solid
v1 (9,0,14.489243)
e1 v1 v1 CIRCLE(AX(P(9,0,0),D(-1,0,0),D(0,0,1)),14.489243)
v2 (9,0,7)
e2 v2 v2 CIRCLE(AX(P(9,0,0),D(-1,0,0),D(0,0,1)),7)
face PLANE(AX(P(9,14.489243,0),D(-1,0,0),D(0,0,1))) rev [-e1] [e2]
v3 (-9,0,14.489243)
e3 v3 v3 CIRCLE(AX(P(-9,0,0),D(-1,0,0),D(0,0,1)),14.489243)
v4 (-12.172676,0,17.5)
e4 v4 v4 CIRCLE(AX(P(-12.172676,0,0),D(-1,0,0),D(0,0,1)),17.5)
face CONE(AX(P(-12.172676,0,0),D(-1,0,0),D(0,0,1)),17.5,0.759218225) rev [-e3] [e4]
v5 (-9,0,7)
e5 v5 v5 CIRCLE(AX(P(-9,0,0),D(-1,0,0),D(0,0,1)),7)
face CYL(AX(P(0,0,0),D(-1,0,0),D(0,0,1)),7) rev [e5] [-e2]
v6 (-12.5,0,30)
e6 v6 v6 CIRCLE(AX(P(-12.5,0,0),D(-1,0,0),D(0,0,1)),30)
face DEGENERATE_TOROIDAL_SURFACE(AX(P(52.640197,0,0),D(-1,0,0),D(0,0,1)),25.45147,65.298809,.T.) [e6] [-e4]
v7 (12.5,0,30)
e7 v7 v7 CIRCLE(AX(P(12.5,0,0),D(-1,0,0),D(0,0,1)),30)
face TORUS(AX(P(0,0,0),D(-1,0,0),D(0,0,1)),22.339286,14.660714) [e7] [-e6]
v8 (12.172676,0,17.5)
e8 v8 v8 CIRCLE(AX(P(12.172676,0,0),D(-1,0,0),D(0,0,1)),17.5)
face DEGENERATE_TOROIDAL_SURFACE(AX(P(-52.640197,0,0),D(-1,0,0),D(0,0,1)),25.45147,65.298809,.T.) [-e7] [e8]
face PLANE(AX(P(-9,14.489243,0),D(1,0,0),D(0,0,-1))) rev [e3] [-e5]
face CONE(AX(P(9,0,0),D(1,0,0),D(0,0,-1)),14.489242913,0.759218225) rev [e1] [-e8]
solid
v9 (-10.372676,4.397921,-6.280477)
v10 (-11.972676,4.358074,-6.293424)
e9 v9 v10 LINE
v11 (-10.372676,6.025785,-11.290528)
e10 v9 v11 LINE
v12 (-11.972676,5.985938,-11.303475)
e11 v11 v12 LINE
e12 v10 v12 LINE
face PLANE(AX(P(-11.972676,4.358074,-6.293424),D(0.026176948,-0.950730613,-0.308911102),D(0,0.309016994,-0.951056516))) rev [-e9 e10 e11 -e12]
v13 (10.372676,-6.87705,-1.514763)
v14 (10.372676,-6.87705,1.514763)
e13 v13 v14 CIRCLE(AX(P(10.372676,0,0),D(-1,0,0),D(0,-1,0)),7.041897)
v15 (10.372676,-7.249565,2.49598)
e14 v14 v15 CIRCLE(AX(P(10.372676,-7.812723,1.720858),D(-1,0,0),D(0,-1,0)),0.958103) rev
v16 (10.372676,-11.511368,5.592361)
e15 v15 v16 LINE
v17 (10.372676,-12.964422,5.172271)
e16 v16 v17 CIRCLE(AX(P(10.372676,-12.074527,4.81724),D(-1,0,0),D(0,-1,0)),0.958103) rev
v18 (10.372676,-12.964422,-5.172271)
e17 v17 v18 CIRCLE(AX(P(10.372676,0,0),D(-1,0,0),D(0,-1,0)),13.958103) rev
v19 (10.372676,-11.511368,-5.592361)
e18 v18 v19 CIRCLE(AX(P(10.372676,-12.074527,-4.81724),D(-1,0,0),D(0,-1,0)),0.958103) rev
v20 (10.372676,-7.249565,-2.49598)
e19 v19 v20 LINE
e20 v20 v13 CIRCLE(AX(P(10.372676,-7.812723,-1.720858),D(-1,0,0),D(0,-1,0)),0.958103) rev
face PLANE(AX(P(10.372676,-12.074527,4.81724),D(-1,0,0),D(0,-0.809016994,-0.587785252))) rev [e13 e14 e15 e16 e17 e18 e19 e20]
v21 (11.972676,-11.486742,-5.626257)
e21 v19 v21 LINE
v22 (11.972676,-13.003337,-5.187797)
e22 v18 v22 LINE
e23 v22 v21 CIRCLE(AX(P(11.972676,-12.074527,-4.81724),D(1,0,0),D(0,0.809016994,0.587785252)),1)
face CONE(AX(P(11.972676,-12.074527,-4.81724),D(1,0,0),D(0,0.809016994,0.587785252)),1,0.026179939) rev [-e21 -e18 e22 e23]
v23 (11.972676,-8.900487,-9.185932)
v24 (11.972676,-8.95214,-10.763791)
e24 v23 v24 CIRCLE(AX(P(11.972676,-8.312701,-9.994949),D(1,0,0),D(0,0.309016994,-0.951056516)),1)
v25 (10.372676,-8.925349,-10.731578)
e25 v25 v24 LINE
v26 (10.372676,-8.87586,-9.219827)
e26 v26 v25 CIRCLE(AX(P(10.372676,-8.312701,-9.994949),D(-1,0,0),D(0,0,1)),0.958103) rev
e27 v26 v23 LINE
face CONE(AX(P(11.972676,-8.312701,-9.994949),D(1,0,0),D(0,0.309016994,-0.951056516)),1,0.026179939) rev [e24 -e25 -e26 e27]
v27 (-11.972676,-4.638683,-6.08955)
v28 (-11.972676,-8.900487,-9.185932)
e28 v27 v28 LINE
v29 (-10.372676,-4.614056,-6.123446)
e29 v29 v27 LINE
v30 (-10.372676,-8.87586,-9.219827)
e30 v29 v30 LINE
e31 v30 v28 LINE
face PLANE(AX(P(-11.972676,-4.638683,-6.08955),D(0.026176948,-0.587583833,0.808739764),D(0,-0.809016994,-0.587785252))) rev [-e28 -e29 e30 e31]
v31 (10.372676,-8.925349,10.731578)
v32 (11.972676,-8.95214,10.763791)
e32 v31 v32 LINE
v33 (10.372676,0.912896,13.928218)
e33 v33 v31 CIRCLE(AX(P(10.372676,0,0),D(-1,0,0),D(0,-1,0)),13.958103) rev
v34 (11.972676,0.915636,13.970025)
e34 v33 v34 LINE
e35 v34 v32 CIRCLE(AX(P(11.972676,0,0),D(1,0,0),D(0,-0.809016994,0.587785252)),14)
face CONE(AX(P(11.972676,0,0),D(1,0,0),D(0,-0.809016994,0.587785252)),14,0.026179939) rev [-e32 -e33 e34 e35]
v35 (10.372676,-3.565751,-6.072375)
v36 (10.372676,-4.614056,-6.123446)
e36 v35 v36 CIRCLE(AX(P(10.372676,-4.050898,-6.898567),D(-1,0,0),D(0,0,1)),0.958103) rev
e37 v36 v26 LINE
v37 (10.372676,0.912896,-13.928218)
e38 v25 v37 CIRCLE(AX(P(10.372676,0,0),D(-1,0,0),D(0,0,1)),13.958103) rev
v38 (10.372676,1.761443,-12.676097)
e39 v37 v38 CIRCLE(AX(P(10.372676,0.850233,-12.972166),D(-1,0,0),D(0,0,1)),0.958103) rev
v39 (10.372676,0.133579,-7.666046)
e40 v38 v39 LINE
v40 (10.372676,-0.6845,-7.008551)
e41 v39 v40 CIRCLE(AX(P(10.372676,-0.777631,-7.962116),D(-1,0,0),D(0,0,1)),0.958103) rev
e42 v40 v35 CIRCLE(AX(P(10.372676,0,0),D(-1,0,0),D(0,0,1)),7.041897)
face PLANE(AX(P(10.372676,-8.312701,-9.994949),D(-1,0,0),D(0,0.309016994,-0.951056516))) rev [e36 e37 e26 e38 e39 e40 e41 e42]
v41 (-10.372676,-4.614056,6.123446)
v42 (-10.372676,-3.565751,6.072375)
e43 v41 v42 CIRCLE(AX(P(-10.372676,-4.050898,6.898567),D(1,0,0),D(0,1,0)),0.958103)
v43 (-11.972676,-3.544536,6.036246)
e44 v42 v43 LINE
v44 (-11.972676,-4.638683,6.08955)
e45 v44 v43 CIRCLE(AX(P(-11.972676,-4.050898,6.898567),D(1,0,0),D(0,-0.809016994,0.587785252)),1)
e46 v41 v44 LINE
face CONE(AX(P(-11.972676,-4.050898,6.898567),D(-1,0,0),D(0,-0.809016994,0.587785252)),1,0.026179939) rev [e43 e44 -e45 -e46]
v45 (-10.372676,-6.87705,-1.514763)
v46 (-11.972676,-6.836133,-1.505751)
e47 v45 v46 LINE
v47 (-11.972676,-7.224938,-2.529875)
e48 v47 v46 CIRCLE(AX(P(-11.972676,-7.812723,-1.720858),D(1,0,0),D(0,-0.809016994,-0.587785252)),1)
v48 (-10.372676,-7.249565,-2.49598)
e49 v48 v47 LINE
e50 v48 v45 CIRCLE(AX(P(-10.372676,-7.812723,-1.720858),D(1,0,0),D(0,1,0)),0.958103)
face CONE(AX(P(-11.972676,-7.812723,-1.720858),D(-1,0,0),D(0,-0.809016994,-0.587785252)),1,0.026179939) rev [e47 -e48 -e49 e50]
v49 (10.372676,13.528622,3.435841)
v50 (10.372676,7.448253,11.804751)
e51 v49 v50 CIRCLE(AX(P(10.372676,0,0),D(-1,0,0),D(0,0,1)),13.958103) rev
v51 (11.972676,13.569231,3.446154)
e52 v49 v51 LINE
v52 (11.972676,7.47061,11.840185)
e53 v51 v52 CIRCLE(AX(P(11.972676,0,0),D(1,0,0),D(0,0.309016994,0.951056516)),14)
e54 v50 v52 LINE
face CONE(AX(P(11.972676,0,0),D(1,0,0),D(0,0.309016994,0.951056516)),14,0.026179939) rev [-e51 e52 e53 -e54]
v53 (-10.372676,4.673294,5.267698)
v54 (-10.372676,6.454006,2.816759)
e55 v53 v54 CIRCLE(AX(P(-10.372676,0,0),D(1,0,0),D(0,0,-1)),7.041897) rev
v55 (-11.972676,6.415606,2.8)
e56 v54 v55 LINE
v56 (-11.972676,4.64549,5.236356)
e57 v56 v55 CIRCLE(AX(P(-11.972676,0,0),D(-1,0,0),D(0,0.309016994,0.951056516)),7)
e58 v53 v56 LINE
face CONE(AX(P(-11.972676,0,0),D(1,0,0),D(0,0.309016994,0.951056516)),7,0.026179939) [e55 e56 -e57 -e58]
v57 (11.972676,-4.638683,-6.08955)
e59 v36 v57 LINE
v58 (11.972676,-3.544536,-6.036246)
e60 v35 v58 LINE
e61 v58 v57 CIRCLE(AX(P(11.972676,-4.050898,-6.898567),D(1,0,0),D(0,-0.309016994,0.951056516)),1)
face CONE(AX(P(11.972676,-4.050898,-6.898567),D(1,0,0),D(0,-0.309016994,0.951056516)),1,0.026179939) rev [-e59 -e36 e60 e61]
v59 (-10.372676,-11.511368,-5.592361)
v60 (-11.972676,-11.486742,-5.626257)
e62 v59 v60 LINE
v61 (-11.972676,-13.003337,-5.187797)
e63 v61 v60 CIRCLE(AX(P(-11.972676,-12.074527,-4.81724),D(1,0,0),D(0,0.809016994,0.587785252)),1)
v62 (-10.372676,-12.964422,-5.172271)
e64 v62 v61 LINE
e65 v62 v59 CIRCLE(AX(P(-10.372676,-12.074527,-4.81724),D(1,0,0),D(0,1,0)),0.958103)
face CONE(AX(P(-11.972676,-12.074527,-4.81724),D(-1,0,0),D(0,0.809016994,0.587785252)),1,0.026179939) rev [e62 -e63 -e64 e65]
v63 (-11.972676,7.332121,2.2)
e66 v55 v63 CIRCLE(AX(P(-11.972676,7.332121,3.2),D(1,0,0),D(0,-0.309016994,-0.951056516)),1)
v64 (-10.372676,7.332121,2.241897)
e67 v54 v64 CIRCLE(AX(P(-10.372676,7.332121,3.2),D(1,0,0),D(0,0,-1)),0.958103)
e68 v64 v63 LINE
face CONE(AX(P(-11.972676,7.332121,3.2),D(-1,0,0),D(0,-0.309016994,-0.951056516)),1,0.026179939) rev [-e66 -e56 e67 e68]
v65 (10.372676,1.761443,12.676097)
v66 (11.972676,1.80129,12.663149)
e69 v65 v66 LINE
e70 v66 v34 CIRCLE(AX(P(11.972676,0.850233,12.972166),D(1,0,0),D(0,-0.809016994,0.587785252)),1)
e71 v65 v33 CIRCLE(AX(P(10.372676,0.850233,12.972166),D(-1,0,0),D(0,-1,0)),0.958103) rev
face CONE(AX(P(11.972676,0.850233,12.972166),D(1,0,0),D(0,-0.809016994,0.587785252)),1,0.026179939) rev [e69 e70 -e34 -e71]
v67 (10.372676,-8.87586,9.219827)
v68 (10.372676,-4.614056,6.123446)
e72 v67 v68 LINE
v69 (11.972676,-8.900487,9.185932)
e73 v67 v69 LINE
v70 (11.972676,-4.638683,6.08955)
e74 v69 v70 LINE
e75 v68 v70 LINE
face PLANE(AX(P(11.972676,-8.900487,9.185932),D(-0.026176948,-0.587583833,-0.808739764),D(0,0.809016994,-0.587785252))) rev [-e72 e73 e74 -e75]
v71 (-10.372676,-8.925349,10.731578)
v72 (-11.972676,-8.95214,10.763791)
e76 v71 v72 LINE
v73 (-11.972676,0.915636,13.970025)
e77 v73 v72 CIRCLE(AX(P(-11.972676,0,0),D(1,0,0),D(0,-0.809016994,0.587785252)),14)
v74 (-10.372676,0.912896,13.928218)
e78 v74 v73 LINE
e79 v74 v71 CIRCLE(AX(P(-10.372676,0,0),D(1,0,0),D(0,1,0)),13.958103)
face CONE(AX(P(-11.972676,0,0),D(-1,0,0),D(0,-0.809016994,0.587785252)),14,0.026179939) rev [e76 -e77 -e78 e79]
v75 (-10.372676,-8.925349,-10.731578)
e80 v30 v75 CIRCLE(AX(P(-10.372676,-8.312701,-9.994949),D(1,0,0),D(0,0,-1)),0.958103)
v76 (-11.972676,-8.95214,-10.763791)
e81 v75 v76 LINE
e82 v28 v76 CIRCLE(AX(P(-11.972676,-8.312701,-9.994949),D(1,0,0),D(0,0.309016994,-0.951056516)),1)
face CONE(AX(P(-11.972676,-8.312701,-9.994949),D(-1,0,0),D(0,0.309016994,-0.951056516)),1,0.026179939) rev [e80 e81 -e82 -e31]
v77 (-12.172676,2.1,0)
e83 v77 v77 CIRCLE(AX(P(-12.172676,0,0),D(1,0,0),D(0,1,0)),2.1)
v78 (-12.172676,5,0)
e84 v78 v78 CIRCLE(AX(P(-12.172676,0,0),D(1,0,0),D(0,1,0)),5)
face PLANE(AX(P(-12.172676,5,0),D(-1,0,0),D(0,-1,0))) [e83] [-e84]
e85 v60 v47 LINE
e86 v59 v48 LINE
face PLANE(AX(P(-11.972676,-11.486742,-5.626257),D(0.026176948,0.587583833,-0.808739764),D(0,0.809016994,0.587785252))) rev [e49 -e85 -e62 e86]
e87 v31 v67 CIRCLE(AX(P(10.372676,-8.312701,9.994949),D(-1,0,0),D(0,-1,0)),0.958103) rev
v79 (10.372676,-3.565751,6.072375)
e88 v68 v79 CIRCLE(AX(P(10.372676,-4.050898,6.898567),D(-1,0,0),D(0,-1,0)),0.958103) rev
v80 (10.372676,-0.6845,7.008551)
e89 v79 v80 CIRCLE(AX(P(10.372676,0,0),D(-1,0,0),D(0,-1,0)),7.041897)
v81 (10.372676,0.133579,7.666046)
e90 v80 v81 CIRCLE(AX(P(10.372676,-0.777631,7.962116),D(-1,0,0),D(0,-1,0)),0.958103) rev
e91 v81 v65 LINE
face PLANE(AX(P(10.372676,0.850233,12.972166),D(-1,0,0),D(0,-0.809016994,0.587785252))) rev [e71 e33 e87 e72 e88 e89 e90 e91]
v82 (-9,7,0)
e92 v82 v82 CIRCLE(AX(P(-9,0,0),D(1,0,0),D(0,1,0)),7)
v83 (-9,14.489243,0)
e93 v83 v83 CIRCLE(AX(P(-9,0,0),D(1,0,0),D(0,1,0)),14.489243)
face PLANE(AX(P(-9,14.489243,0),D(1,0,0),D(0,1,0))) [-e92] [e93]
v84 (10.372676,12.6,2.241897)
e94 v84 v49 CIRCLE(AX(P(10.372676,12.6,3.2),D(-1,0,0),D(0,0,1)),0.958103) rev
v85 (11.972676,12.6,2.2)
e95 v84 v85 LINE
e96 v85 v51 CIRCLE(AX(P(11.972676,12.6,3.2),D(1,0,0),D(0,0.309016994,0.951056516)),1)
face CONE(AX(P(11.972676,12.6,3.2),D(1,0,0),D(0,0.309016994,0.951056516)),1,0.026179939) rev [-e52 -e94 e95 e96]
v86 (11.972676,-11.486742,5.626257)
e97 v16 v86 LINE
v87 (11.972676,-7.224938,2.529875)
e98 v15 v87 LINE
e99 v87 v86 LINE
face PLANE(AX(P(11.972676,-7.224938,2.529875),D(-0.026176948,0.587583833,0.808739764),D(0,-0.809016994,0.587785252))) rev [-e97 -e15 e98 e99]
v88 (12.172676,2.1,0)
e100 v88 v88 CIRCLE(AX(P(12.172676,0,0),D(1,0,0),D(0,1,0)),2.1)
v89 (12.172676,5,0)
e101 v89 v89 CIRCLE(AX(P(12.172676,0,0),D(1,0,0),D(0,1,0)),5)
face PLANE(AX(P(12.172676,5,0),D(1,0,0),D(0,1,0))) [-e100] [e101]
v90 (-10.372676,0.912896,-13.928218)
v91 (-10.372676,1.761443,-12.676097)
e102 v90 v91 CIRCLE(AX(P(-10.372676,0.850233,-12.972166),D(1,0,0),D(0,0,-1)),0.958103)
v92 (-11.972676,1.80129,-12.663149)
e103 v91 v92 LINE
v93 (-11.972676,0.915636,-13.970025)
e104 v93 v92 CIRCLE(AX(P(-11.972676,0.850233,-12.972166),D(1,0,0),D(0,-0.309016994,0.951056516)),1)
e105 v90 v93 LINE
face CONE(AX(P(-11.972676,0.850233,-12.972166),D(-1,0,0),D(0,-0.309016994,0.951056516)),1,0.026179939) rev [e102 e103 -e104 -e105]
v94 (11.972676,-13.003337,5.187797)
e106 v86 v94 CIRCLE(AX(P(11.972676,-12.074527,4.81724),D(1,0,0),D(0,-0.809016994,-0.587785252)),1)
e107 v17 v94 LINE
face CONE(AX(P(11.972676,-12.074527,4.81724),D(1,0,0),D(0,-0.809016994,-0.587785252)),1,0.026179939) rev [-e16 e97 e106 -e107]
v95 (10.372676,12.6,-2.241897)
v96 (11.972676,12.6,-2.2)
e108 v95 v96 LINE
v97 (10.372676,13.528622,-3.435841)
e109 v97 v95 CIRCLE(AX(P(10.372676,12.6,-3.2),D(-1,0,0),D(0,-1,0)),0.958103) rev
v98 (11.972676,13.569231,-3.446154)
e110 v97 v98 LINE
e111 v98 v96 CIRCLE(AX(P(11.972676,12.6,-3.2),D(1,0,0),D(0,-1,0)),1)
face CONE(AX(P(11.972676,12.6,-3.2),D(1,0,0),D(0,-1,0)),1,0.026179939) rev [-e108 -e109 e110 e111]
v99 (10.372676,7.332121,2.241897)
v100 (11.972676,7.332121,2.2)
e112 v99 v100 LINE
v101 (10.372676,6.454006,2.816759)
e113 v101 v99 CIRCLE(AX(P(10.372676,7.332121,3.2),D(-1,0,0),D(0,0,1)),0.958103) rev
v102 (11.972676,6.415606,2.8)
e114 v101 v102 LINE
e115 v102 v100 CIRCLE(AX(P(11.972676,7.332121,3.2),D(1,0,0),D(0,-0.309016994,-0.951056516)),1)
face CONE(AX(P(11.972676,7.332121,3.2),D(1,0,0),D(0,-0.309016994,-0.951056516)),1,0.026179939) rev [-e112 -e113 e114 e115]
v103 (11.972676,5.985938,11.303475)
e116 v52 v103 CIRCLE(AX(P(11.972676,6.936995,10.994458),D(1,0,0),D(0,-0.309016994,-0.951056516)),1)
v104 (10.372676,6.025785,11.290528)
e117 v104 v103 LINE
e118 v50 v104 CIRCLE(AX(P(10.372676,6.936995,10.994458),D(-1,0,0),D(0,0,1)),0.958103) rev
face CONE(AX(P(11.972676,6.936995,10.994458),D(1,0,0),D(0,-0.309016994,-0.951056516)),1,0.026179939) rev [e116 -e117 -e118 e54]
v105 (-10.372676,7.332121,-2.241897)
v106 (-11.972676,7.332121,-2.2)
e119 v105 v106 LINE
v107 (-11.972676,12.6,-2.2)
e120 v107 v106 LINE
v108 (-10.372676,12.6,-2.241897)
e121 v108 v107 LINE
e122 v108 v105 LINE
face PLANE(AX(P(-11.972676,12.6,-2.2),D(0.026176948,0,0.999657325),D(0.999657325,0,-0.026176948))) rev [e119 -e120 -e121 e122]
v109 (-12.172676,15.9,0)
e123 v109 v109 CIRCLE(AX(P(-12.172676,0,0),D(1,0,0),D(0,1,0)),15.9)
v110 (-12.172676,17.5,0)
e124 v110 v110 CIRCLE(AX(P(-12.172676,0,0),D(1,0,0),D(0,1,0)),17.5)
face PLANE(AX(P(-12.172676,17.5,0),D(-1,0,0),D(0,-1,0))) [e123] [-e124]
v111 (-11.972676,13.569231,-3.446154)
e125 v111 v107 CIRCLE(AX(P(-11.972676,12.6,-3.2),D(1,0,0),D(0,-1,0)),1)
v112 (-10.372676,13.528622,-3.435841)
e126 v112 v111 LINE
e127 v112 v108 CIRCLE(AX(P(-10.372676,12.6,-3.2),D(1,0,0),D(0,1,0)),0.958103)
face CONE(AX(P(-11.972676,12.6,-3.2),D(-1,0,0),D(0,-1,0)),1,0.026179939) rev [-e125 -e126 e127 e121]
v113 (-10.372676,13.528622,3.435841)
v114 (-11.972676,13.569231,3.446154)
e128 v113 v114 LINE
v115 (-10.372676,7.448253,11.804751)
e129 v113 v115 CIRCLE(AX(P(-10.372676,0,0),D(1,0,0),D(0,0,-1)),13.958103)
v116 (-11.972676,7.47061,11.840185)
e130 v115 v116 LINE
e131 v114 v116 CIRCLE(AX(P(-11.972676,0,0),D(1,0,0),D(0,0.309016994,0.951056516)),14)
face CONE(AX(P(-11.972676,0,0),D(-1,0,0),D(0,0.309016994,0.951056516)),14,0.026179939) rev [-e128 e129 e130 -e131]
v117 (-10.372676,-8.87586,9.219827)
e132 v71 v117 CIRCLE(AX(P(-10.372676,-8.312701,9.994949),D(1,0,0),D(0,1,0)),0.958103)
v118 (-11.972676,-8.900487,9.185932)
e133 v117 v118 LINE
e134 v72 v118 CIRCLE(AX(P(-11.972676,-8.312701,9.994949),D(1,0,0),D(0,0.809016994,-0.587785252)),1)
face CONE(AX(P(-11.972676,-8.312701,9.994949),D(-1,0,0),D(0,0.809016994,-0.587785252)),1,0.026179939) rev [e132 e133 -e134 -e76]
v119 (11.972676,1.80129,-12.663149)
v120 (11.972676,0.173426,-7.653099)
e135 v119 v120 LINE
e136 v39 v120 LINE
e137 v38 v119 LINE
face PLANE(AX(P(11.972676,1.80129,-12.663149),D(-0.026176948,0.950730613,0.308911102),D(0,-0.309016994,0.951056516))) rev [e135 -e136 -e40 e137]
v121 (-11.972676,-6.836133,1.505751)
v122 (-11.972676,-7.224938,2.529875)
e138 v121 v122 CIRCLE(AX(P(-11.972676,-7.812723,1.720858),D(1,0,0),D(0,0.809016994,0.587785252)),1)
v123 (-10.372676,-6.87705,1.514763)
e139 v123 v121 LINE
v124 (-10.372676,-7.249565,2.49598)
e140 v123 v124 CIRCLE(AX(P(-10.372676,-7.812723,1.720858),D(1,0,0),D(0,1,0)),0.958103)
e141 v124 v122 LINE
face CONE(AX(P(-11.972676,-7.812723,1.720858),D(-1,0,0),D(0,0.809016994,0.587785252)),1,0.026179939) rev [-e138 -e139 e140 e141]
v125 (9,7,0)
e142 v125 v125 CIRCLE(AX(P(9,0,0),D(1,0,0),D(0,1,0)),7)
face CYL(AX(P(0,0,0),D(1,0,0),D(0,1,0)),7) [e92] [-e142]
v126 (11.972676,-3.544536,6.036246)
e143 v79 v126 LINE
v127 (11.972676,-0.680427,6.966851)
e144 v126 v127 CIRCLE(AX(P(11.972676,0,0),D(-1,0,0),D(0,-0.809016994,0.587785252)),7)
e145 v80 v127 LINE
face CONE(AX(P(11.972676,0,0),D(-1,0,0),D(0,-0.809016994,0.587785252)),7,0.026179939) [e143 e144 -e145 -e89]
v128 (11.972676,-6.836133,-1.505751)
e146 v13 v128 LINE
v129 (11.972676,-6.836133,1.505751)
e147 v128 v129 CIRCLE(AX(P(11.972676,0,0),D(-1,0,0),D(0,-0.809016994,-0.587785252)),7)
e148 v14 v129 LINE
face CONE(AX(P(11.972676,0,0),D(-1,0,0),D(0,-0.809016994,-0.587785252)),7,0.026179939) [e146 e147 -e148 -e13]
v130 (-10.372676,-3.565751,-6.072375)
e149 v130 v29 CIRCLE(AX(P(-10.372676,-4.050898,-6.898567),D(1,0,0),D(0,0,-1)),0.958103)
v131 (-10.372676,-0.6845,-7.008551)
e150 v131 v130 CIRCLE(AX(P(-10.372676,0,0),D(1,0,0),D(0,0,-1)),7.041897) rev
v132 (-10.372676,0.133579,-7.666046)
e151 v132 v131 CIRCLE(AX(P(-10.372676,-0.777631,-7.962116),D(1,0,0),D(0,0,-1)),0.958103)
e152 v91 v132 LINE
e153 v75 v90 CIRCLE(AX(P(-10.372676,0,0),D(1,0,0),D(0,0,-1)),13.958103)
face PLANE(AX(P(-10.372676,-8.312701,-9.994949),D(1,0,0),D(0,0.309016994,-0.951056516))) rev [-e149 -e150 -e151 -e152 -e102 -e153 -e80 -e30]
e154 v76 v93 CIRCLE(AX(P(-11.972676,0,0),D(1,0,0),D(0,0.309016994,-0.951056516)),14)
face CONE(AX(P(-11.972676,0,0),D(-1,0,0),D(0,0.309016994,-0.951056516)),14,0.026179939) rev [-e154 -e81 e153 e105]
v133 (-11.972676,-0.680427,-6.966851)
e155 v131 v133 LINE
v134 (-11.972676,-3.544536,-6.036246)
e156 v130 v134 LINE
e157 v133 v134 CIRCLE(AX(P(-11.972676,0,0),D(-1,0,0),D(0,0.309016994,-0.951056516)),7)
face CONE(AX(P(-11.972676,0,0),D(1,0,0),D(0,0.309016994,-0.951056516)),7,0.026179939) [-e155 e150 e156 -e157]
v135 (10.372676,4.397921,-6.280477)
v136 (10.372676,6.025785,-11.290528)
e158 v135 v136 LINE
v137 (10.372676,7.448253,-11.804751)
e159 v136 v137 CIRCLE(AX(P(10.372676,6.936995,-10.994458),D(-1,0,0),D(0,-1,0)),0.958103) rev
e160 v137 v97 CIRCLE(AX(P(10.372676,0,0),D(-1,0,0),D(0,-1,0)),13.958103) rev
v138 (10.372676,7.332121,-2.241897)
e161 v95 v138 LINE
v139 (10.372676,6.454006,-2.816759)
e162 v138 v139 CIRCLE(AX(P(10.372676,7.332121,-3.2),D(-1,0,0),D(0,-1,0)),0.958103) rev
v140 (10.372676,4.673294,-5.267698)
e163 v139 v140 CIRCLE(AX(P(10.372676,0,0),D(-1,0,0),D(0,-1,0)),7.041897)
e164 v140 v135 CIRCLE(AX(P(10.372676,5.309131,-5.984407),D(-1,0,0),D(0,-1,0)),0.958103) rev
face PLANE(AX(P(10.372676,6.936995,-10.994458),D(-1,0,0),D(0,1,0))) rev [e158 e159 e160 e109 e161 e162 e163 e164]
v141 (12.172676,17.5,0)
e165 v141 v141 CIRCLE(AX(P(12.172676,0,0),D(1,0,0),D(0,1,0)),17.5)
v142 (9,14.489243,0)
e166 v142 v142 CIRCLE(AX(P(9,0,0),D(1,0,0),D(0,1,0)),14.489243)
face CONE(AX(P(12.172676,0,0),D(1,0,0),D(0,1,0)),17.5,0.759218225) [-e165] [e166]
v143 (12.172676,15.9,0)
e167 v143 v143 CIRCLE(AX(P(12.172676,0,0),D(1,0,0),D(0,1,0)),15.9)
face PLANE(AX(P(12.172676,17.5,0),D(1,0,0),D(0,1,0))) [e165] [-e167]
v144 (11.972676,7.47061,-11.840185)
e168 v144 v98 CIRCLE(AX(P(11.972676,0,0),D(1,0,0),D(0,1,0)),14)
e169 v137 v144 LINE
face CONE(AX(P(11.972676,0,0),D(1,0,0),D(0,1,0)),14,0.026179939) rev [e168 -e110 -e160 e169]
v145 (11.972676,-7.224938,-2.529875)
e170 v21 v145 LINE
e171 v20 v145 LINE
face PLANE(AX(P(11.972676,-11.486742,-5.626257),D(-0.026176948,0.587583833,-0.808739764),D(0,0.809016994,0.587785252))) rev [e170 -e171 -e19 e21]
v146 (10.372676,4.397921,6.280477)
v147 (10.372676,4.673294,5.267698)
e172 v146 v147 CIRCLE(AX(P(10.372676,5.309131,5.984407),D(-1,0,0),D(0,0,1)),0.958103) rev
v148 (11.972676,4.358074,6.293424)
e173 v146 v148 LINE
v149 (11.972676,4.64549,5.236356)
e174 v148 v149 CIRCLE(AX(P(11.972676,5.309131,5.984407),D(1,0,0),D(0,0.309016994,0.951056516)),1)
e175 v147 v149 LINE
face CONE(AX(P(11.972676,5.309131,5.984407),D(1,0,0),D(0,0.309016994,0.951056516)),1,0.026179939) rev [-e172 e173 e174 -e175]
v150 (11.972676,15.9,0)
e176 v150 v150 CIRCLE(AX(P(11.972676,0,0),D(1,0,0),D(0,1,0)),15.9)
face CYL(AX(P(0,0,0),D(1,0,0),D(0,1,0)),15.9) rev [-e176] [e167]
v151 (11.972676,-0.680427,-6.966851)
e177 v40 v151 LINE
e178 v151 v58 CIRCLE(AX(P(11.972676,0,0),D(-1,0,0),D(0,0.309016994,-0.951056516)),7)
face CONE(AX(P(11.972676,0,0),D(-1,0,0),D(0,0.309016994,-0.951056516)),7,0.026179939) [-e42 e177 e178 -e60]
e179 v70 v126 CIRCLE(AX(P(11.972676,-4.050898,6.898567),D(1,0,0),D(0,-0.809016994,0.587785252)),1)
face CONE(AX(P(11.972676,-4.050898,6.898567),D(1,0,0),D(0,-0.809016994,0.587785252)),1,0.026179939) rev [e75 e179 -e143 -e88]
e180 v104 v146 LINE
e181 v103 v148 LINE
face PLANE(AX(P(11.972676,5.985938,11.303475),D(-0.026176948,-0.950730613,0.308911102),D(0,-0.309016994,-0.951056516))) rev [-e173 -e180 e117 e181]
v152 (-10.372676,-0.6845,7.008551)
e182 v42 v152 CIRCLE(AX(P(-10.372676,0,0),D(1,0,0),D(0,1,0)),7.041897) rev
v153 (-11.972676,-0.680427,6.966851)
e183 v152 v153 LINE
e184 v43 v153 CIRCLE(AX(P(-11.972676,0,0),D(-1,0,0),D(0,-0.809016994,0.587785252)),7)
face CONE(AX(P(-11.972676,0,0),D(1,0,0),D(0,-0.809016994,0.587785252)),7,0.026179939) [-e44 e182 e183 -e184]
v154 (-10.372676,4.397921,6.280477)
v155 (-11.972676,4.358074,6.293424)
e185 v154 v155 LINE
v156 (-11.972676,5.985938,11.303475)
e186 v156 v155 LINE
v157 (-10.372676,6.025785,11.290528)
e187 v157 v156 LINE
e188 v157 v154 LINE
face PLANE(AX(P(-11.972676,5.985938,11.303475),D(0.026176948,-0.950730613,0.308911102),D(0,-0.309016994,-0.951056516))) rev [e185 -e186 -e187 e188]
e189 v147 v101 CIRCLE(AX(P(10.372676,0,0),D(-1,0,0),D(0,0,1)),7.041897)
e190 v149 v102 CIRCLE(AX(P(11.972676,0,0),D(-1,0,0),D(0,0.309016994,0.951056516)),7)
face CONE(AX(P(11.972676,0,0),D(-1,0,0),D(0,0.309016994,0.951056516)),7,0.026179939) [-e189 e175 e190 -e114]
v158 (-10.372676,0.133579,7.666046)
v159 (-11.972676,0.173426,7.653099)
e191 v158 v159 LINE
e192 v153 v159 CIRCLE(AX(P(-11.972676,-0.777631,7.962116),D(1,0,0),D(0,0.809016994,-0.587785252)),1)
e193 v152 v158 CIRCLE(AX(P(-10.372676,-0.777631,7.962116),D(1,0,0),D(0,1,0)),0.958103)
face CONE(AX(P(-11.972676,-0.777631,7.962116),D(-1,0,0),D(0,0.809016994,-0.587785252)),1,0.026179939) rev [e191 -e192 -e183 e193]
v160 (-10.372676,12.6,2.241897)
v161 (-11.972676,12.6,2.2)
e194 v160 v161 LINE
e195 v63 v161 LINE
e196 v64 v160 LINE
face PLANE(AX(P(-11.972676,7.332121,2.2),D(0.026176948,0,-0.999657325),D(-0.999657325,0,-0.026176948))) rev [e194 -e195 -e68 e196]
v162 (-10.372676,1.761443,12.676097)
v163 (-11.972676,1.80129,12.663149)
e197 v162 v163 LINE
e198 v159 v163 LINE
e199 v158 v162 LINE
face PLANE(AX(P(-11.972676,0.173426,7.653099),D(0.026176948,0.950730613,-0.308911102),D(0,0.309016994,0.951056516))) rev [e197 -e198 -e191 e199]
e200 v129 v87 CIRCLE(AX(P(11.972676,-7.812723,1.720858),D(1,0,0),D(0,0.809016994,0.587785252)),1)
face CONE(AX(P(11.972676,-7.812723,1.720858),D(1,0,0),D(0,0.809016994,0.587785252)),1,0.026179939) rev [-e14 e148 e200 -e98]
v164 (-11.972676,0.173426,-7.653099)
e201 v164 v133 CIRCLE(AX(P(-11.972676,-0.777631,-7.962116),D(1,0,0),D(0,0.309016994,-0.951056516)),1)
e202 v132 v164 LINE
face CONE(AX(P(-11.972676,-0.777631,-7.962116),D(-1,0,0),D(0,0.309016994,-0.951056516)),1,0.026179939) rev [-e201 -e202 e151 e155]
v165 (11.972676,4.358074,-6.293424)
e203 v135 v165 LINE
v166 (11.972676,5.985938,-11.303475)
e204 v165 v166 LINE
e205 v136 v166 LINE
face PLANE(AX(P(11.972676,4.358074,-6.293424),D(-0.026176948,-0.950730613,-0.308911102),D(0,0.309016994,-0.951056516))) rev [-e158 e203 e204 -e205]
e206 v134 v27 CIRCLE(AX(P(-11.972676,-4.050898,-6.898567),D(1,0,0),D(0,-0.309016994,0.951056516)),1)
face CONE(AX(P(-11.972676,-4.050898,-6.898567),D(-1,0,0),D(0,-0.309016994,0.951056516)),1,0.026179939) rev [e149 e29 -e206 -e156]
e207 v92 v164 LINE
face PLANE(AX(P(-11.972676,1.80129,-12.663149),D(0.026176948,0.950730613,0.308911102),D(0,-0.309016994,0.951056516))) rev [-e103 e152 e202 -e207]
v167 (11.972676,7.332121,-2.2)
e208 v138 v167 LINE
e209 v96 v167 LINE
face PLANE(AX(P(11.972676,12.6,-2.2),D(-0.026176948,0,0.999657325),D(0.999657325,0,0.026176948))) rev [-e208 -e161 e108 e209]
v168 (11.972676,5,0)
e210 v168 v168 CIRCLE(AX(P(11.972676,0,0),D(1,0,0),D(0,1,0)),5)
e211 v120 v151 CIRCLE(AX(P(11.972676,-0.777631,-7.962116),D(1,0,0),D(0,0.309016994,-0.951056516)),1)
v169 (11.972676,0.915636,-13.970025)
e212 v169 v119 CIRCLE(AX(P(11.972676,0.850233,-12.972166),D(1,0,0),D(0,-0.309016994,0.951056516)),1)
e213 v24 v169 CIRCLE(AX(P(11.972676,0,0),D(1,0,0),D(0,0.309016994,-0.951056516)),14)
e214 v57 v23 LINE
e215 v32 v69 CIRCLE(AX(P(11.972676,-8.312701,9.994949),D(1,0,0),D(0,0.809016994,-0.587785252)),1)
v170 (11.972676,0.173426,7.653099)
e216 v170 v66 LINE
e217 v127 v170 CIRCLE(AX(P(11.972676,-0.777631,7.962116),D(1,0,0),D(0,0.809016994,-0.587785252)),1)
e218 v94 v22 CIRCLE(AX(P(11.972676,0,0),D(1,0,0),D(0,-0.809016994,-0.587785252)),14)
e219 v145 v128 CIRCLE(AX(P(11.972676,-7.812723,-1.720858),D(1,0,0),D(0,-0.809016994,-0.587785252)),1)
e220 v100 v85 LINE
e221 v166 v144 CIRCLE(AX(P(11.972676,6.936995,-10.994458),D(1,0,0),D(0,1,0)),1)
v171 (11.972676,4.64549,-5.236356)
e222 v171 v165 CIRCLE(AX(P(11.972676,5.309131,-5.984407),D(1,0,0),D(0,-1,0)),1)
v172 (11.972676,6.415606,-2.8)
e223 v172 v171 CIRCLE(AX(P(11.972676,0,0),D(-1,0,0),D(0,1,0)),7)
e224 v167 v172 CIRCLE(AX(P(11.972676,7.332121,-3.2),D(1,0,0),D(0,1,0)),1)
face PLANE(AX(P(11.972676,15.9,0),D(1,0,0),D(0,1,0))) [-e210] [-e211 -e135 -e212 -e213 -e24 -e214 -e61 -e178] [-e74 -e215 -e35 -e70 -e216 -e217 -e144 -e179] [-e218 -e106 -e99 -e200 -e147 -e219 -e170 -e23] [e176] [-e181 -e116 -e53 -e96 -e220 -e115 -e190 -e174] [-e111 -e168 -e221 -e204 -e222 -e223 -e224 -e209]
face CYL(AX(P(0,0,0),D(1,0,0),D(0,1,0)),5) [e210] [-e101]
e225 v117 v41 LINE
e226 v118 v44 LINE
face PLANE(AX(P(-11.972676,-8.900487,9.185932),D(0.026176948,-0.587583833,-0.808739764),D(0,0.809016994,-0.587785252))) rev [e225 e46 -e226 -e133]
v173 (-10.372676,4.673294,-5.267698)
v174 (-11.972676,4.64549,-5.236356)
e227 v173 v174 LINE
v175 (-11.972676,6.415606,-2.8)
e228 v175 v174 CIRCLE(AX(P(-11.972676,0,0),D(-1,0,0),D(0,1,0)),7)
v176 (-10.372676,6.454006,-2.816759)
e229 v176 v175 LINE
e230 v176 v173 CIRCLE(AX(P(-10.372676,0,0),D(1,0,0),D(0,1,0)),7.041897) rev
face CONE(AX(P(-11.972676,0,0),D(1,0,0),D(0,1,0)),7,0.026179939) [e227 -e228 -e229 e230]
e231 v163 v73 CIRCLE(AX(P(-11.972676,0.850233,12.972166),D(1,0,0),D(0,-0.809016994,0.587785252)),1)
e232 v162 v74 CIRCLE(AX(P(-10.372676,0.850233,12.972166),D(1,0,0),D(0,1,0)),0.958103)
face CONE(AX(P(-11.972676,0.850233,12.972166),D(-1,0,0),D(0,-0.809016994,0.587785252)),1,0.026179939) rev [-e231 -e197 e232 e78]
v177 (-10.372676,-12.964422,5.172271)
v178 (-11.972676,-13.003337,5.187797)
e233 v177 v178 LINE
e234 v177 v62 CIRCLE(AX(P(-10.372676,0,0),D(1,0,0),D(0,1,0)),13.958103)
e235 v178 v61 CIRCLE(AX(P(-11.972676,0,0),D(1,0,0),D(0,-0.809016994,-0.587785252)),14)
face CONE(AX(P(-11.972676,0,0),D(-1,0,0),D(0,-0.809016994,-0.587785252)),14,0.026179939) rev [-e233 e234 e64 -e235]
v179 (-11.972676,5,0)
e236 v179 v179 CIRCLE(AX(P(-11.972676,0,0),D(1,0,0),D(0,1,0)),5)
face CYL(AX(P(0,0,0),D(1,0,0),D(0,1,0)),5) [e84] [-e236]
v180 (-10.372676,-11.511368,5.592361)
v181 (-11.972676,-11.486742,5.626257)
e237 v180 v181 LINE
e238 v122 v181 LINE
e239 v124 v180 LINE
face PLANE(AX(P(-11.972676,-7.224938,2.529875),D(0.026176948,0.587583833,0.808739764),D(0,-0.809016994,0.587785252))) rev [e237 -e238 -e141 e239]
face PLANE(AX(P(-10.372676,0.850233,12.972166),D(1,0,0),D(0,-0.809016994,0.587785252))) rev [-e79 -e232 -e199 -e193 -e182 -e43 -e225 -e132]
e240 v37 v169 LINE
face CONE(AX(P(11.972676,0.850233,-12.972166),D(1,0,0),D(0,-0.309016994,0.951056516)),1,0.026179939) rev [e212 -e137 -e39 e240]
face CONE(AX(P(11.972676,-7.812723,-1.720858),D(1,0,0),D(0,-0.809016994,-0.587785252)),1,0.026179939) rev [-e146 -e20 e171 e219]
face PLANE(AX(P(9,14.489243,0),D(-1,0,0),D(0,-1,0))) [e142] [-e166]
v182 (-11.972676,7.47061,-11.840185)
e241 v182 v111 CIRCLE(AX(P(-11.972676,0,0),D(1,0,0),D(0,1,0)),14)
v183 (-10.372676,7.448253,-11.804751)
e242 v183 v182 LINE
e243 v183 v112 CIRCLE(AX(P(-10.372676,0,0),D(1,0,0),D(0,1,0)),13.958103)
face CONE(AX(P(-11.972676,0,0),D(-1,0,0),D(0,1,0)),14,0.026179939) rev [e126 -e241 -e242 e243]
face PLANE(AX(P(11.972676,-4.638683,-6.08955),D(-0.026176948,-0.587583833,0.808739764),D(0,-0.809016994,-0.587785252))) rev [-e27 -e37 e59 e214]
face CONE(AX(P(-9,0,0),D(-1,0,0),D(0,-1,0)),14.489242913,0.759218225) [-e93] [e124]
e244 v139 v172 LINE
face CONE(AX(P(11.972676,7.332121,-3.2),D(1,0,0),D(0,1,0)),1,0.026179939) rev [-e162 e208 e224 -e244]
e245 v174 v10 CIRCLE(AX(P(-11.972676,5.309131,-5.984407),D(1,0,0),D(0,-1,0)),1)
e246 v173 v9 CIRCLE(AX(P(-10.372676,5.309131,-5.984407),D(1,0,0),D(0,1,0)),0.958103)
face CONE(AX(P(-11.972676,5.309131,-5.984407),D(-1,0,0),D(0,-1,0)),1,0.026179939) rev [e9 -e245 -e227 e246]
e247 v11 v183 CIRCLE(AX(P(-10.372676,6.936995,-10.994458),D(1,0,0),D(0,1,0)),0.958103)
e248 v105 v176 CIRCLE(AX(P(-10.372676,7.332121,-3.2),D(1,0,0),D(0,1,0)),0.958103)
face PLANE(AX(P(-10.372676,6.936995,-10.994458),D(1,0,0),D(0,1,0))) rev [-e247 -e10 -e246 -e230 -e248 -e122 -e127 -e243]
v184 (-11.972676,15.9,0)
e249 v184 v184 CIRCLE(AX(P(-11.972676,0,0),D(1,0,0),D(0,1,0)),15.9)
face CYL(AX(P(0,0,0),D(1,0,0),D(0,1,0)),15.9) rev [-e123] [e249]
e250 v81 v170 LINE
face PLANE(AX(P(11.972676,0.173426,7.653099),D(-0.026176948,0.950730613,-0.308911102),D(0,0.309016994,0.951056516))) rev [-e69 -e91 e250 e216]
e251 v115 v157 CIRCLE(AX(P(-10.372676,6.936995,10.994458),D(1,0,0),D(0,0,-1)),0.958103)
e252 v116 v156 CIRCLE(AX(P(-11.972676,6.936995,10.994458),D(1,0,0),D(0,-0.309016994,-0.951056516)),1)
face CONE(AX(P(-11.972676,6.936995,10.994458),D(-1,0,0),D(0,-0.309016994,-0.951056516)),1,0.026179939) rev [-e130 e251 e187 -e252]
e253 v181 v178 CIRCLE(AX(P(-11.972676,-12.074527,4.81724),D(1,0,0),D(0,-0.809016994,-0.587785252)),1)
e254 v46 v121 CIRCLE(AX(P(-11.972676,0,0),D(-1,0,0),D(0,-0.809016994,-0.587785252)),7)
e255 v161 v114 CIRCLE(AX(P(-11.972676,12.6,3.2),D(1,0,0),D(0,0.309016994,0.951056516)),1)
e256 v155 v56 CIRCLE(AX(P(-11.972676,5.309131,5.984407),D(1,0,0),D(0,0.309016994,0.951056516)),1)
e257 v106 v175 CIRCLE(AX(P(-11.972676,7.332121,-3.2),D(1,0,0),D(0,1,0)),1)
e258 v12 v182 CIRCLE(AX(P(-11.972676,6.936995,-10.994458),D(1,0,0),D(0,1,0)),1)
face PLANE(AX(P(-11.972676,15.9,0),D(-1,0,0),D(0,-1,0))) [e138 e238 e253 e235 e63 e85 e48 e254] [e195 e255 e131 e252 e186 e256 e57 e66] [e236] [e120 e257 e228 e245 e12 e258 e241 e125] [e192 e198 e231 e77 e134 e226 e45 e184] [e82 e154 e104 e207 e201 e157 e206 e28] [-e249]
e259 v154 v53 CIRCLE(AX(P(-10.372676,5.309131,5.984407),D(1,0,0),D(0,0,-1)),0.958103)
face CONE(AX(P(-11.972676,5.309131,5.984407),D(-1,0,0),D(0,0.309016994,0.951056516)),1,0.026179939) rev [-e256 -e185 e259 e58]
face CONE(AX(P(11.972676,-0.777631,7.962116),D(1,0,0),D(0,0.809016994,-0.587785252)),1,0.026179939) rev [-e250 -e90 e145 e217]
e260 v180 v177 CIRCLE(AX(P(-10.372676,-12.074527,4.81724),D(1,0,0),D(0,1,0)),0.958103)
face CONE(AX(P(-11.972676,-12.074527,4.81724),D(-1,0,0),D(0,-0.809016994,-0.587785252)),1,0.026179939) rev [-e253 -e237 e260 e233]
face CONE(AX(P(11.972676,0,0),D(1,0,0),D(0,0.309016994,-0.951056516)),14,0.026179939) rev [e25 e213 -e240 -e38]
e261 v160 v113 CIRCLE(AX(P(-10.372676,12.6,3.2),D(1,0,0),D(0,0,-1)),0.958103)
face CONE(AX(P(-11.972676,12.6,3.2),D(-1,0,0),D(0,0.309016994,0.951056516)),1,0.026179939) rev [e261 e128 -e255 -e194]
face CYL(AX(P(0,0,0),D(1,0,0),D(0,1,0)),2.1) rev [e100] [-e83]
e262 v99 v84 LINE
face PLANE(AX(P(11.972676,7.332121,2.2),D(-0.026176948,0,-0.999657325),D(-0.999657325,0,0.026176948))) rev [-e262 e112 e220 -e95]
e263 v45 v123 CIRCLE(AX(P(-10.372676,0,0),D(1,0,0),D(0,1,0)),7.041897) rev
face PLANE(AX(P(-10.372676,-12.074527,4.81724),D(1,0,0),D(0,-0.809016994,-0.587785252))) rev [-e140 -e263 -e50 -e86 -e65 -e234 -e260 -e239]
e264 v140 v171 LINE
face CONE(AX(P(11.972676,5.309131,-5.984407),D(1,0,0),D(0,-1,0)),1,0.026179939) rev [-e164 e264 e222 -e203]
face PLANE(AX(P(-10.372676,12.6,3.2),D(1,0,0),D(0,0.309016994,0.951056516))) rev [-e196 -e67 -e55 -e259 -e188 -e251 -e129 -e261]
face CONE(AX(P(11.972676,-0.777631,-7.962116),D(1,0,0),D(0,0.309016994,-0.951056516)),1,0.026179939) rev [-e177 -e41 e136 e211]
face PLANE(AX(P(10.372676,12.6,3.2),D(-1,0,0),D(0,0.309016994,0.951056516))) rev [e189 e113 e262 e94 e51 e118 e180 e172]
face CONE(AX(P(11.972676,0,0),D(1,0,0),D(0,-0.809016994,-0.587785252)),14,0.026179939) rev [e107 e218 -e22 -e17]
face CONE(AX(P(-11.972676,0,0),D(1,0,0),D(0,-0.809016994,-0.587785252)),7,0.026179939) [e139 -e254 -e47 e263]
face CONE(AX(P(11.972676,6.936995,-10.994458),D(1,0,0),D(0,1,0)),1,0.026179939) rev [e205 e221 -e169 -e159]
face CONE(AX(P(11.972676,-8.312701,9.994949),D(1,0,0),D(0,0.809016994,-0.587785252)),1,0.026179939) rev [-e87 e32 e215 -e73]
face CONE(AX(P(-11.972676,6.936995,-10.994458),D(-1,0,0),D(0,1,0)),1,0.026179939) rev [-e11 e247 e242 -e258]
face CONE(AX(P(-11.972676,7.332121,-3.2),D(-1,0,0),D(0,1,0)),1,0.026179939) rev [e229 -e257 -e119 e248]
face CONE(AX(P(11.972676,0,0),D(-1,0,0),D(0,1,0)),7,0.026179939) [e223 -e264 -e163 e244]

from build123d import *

# Parameters (mm, degrees)
EXTRUDE1_DEPTH       = 1.6
EXTRUDE1_TAPER       = 1.5000000000000033
CIRPATTERN1_COUNT    = 5
MIRROR1_COPY_1_DEPTH = 1.6
MIRROR1_COPY_1_TAPER = 1.5000000000000033
MIRROR1_COPY_2_DEPTH = 1.6
MIRROR1_COPY_2_TAPER = 1.5000000000000033
MIRROR1_COPY_3_DEPTH = 1.6
MIRROR1_COPY_3_TAPER = 1.5000000000000033
MIRROR1_COPY_4_DEPTH = 1.6
MIRROR1_COPY_4_TAPER = 1.5000000000000033
MIRROR1_COPY_5_DEPTH = 1.6
MIRROR1_COPY_5_TAPER = 1.5000000000000033


with BuildPart() as part:
    # Sketch1 → Revolve1 (revolve)
    with BuildSketch(Plane.XY):
        with BuildLine():
            Line((12.172675980385165, 17.5), (9, 14.489242912947049))
            Line((9, 14.489242912947049), (9.000000000000002, 6.999999999999997))
            Line((9.000000000000002, 6.999999999999997), (-9.000000000000002, 6.999999999999997))
            Line((-9.000000000000002, 6.999999999999997), (-9, 14.489242912947049))
            Line((-9, 14.489242912947049), (-12.172675980385165, 17.5))
            ThreePointArc((-12.172675980385165, 17.5), (-12.636235187685259, 23.742146915507664), (-12.5, 30))
            ThreePointArc((-12.5, 30), (-2.36e-15, 37), (12.5, 30))
            ThreePointArc((12.5, 30), (12.636235187685259, 23.74214691550764), (12.172675980385165, 17.5))
        make_face()
    revolve(axis=Axis((0, 0, 0), (1, 0, 0)))


with BuildPart() as body_2:
    # Sketch3 → Revolve2 (revolve)
    with BuildSketch(Plane.XY):
        Polygon((-9, 14.489242912947049), (-12.17267598038517, 17.500000000000014), (-12.17267598038517, 15.900000000000015), (-11.97267598038517, 15.900000000000015), (-11.972675980385167, 4.999999999999997), (-12.172675980385169, 4.999999999999998), (-12.17267598038517, 2.0999999999999996), (12.17267598038517, 2.0999999999999996), (12.172675980385169, 4.999999999999998), (11.972675980385167, 4.999999999999997), (11.97267598038517, 15.900000000000015), (12.17267598038517, 15.900000000000015), (12.17267598038517, 17.500000000000014), (9, 14.489242912947049), (9.000000000000002, 6.999999999999997), (-9.000000000000002, 6.999999999999997), align=None)
    revolve(axis=Axis((0, 0, 0), (-1, -1.2e-16, 0)))

    # Sketch2 → Extrude1 (cut)
    with BuildSketch(Plane(origin=(-11.972675980385166, -1.41e-15, 0), x_dir=(0, 0, -1), z_dir=(1, 1.2e-16, 0))):
        with BuildLine():
            Line((2.2, 12.600000000000001), (2.200000000000001, 7.332121111929343))
            ThreePointArc((2.200000000000001, 7.332121111929343), (2.3633399734659255, 6.784398554424177), (2.8000000000000007, 6.415605972938175))
            ThreePointArc((2.8000000000000007, 6.415605972938175), (4.114496766047321, 5.663118960624628), (5.236356282295121, 4.645489520477732))
            ThreePointArc((5.236356282295121, 4.645489520477732), (5.722034239041937, 4.344164331915463), (6.293424174140796, 4.358074364250823))
            Line((6.293424174140796, 4.358074364250823), (11.303474717694066, 5.985938464973643))
            ThreePointArc((11.303474717694066, 5.985938464973643), (11.934894376419996, 6.597026009884018), (11.840185240497515, 7.470609979827936))
            ThreePointArc((11.840185240497515, 7.470609979827936), (8.22899353209464, 11.32623792124925), (3.446153846153846, 13.569230769230767))
            ThreePointArc((3.446153846153846, 13.569230769230767), (2.58605938648508, 13.389352217376327), (2.2, 12.600000000000001))
        make_face()
    extrude1 = extrude(amount=EXTRUDE1_DEPTH, taper=EXTRUDE1_TAPER, mode=Mode.SUBTRACT)

    # CirPattern1: Extrude1 ×5 about axis
    cirpattern1_axis = Axis((0, 0, 0), (-1, 0, 0))
    for i in range(1, CIRPATTERN1_COUNT):
        add(extrude1.rotate(cirpattern1_axis, i * 360 / CIRPATTERN1_COUNT), mode=Mode.SUBTRACT)

    # Mirror1 copy 1 sketch → Mirror1 copy 1 (cut)
    with BuildSketch(Plane(origin=(11.972675980385166, -4.4e-16, 1.34e-15), x_dir=(0, -0.9510565162951535, -0.30901699437494745), z_dir=(-1, 4e-17, -1.1e-16))):
        with BuildLine():
            Line((2.2, -12.600000000000001), (2.200000000000001, -7.332121111929343))
            ThreePointArc((2.200000000000001, -7.332121111929343), (2.3633399734659255, -6.784398554424177), (2.8000000000000007, -6.415605972938175))
            ThreePointArc((2.8000000000000007, -6.415605972938175), (4.114496766047321, -5.663118960624628), (5.236356282295121, -4.645489520477732))
            ThreePointArc((5.236356282295121, -4.645489520477732), (5.722034239041937, -4.344164331915463), (6.293424174140796, -4.358074364250823))
            Line((6.293424174140796, -4.358074364250823), (11.303474717694066, -5.985938464973643))
            ThreePointArc((11.303474717694066, -5.985938464973643), (11.934894376419996, -6.597026009884018), (11.840185240497515, -7.470609979827936))
            ThreePointArc((11.840185240497515, -7.470609979827936), (8.22899353209464, -11.32623792124925), (3.446153846153846, -13.569230769230767))
            ThreePointArc((3.446153846153846, -13.569230769230767), (2.58605938648508, -13.389352217376327), (2.2, -12.600000000000001))
        make_face()
    extrude(amount=MIRROR1_COPY_1_DEPTH, taper=MIRROR1_COPY_1_TAPER, mode=Mode.SUBTRACT)

    # Mirror1 copy 2 sketch → Mirror1 copy 2 (cut)
    with BuildSketch(Plane(origin=(11.972675980385166, 1.14e-15, 8.3e-16), x_dir=(0, -0.5877852522924732, 0.8090169943749473), z_dir=(-1, -1e-16, -7e-17))):
        with BuildLine():
            Line((2.2, -12.600000000000001), (2.200000000000001, -7.332121111929343))
            ThreePointArc((2.200000000000001, -7.332121111929343), (2.3633399734659255, -6.784398554424177), (2.8000000000000007, -6.415605972938175))
            ThreePointArc((2.8000000000000007, -6.415605972938175), (4.114496766047321, -5.663118960624628), (5.236356282295121, -4.645489520477732))
            ThreePointArc((5.236356282295121, -4.645489520477732), (5.722034239041937, -4.344164331915463), (6.293424174140796, -4.358074364250823))
            Line((6.293424174140796, -4.358074364250823), (11.303474717694066, -5.985938464973643))
            ThreePointArc((11.303474717694066, -5.985938464973643), (11.934894376419996, -6.597026009884018), (11.840185240497515, -7.470609979827936))
            ThreePointArc((11.840185240497515, -7.470609979827936), (8.22899353209464, -11.32623792124925), (3.446153846153846, -13.569230769230767))
            ThreePointArc((3.446153846153846, -13.569230769230767), (2.58605938648508, -13.389352217376327), (2.2, -12.600000000000001))
        make_face()
    extrude(amount=MIRROR1_COPY_2_DEPTH, taper=MIRROR1_COPY_2_TAPER, mode=Mode.SUBTRACT)

    # Mirror1 copy 3 sketch → Mirror1 copy 3 (cut)
    with BuildSketch(Plane(origin=(11.972675980385164, 1.14e-15, -8.3e-16), x_dir=(0, 0.587785252292473, 0.8090169943749476), z_dir=(-0.9999999999999999, -1e-16, 7e-17))):
        with BuildLine():
            Line((2.2, -12.600000000000001), (2.200000000000001, -7.332121111929343))
            ThreePointArc((2.200000000000001, -7.332121111929343), (2.3633399734659255, -6.784398554424177), (2.8000000000000007, -6.415605972938175))
            ThreePointArc((2.8000000000000007, -6.415605972938175), (4.114496766047321, -5.663118960624628), (5.236356282295121, -4.645489520477732))
            ThreePointArc((5.236356282295121, -4.645489520477732), (5.722034239041937, -4.344164331915463), (6.293424174140796, -4.358074364250823))
            Line((6.293424174140796, -4.358074364250823), (11.303474717694066, -5.985938464973643))
            ThreePointArc((11.303474717694066, -5.985938464973643), (11.934894376419996, -6.597026009884018), (11.840185240497515, -7.470609979827936))
            ThreePointArc((11.840185240497515, -7.470609979827936), (8.22899353209464, -11.32623792124925), (3.446153846153846, -13.569230769230767))
            ThreePointArc((3.446153846153846, -13.569230769230767), (2.58605938648508, -13.389352217376327), (2.2, -12.600000000000001))
        make_face()
    extrude(amount=MIRROR1_COPY_3_DEPTH, taper=MIRROR1_COPY_3_TAPER, mode=Mode.SUBTRACT)

    # Mirror1 copy 4 sketch → Mirror1 copy 4 (cut)
    with BuildSketch(Plane(origin=(11.972675980385166, -4.4e-16, -1.34e-15), x_dir=(0, 0.9510565162951536, -0.30901699437494723), z_dir=(-1, 4e-17, 1.1e-16))):
        with BuildLine():
            Line((2.2, -12.600000000000001), (2.200000000000001, -7.332121111929343))
            ThreePointArc((2.200000000000001, -7.332121111929343), (2.3633399734659255, -6.784398554424177), (2.8000000000000007, -6.415605972938175))
            ThreePointArc((2.8000000000000007, -6.415605972938175), (4.114496766047321, -5.663118960624628), (5.236356282295121, -4.645489520477732))
            ThreePointArc((5.236356282295121, -4.645489520477732), (5.722034239041937, -4.344164331915463), (6.293424174140796, -4.358074364250823))
            Line((6.293424174140796, -4.358074364250823), (11.303474717694066, -5.985938464973643))
            ThreePointArc((11.303474717694066, -5.985938464973643), (11.934894376419996, -6.597026009884018), (11.840185240497515, -7.470609979827936))
            ThreePointArc((11.840185240497515, -7.470609979827936), (8.22899353209464, -11.32623792124925), (3.446153846153846, -13.569230769230767))
            ThreePointArc((3.446153846153846, -13.569230769230767), (2.58605938648508, -13.389352217376327), (2.2, -12.600000000000001))
        make_face()
    extrude(amount=MIRROR1_COPY_4_DEPTH, taper=MIRROR1_COPY_4_TAPER, mode=Mode.SUBTRACT)

    # Mirror1 copy 5 sketch → Mirror1 copy 5 (cut)
    with BuildSketch(Plane(origin=(11.972675980385166, -1.41e-15, 0), x_dir=(0, 0, -1), z_dir=(-1, 1.2e-16, 0))):
        with BuildLine():
            Line((2.2, -12.600000000000001), (2.200000000000001, -7.332121111929343))
            ThreePointArc((2.200000000000001, -7.332121111929343), (2.3633399734659255, -6.784398554424177), (2.8000000000000007, -6.415605972938175))
            ThreePointArc((2.8000000000000007, -6.415605972938175), (4.114496766047321, -5.663118960624628), (5.236356282295121, -4.645489520477732))
            ThreePointArc((5.236356282295121, -4.645489520477732), (5.722034239041937, -4.344164331915463), (6.293424174140796, -4.358074364250823))
            Line((6.293424174140796, -4.358074364250823), (11.303474717694066, -5.985938464973643))
            ThreePointArc((11.303474717694066, -5.985938464973643), (11.934894376419996, -6.597026009884018), (11.840185240497515, -7.470609979827936))
            ThreePointArc((11.840185240497515, -7.470609979827936), (8.22899353209464, -11.32623792124925), (3.446153846153846, -13.569230769230767))
            ThreePointArc((3.446153846153846, -13.569230769230767), (2.58605938648508, -13.389352217376327), (2.2, -12.600000000000001))
        make_face()
    extrude(amount=MIRROR1_COPY_5_DEPTH, taper=MIRROR1_COPY_5_TAPER, mode=Mode.SUBTRACT)


solid = Compound([part.part, body_2.part])
